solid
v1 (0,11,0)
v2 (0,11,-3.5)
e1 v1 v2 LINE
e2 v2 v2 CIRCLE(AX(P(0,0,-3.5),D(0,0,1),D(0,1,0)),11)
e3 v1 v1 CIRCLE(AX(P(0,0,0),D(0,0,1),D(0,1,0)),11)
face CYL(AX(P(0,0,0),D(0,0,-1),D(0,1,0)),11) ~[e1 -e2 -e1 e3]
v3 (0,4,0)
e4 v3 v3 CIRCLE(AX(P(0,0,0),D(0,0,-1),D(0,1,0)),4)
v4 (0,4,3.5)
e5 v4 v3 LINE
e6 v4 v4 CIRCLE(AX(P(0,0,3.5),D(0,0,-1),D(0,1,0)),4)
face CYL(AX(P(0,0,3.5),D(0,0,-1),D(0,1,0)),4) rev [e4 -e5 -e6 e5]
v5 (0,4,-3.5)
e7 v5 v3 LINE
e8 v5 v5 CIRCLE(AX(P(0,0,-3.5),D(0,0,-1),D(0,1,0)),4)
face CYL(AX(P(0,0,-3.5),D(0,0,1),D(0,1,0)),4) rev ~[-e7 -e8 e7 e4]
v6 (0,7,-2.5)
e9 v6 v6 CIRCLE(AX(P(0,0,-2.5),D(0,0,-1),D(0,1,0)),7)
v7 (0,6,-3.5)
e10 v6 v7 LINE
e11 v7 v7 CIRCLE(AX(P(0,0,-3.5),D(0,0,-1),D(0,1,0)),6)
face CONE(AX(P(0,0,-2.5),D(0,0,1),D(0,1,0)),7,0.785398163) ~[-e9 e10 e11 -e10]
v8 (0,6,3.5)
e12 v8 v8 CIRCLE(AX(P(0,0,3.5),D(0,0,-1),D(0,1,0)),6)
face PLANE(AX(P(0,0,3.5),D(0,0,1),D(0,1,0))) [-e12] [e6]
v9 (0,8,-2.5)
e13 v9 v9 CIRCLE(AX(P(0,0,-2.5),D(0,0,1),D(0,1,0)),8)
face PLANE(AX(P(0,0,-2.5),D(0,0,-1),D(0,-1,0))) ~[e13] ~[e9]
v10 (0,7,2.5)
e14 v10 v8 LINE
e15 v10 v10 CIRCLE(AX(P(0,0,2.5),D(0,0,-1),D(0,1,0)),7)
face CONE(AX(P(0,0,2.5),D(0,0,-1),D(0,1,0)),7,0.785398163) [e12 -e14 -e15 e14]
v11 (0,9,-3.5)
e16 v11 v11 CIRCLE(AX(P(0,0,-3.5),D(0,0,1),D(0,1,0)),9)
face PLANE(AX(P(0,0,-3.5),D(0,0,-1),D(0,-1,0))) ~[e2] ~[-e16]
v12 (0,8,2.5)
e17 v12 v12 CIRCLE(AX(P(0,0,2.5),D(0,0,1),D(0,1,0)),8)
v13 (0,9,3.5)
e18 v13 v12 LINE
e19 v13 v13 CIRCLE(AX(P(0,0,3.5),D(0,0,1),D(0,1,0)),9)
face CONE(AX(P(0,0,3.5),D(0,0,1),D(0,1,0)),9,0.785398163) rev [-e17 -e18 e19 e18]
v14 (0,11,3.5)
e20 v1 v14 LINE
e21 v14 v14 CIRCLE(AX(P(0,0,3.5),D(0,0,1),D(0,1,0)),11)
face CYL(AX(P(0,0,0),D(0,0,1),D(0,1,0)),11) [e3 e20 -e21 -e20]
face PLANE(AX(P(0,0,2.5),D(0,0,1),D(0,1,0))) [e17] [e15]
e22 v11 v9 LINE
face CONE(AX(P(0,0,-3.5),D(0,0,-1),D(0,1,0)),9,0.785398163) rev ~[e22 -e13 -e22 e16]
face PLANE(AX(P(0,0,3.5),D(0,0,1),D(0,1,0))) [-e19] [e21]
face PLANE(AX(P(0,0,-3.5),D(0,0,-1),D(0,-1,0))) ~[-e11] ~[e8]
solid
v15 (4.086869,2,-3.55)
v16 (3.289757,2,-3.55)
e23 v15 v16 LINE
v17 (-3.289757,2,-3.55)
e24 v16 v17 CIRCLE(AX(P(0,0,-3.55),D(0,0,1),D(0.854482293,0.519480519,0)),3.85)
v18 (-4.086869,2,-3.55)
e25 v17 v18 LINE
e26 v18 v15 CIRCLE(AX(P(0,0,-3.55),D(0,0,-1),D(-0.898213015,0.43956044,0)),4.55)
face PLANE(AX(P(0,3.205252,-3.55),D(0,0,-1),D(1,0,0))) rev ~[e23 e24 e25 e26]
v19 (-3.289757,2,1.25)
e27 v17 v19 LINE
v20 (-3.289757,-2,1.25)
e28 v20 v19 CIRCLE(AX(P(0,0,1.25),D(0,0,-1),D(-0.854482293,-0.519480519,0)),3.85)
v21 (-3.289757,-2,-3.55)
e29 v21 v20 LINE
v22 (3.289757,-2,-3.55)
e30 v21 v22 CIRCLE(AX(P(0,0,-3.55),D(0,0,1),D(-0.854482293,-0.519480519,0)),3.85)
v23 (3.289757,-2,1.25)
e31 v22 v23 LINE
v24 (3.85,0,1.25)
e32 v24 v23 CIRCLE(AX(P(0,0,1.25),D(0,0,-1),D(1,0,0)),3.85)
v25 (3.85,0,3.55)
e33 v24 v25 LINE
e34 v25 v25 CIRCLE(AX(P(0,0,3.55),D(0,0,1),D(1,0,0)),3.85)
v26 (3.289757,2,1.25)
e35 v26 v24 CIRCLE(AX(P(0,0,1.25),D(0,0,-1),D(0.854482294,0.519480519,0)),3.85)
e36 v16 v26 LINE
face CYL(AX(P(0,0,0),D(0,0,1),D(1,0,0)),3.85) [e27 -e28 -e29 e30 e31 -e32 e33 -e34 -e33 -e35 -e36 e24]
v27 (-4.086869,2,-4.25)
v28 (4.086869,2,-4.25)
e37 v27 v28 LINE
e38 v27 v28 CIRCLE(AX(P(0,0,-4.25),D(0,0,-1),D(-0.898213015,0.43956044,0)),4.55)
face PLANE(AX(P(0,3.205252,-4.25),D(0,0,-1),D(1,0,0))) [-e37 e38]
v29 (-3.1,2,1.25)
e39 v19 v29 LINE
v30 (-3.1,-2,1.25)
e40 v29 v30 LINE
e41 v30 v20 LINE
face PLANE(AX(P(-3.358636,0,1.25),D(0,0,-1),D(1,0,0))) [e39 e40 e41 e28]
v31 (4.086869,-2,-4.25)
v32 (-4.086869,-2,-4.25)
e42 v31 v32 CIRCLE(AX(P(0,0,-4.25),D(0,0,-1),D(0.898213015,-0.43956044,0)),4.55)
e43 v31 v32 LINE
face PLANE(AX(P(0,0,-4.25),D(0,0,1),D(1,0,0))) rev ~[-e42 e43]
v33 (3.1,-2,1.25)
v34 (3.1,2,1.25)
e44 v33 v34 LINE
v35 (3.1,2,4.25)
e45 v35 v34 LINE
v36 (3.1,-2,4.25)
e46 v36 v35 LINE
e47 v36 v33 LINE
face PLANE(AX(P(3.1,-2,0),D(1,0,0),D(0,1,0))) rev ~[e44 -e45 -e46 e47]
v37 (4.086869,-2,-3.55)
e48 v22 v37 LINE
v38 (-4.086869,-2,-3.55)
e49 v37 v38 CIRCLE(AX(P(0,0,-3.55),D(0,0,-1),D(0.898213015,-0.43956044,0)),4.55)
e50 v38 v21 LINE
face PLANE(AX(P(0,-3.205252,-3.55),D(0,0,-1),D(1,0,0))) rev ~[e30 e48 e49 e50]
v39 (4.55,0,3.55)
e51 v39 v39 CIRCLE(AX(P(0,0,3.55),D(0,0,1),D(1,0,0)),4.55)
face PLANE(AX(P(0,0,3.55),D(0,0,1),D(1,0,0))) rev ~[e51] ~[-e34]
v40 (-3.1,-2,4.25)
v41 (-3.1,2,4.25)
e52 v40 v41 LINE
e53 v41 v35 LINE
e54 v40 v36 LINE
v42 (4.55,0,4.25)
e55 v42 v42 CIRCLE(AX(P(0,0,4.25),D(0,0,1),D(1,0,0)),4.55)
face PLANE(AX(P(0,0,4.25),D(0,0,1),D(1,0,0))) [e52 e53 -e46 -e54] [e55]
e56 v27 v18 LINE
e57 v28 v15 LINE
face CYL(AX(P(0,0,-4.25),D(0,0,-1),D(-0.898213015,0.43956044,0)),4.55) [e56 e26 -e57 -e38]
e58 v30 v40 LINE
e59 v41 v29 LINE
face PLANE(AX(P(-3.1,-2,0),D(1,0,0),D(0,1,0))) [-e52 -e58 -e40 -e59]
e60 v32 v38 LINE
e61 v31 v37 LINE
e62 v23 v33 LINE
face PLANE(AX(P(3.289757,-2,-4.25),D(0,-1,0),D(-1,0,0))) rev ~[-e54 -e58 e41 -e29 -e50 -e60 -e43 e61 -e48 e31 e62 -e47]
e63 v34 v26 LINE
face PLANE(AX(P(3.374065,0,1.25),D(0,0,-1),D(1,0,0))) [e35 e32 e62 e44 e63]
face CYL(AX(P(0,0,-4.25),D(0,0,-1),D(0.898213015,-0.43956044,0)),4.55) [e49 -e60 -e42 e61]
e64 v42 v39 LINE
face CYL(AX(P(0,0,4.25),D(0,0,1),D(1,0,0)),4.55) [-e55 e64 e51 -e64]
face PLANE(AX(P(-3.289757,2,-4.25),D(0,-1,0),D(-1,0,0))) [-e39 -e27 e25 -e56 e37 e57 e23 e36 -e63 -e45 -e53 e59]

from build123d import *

# Parameters (mm, degrees)
F4_R      = 3.85
F4_W      = 6.2
F4_H      = 4
F9_DEPTH  = 4.25
F11_DEPTH = 5.5
F13_DEPTH = 0.7
F14_R     = 4.55
F14_R_2   = 3.85
F15_DEPTH = 0.7


# Not quite as in the source:
# - a feature of the source that left no trace in its solid (it failed there, or was rolled back) is left out


with BuildPart() as f2:
    # F1 (on Right) → F2 (revolve)
    with BuildSketch(Plane.YZ):
        Polygon((-11, 0), (-4, 0), (-4, 3.5), (-6, 3.5), (-7, 2.5), (-8, 2.5), (-9, 3.5), (-11, 3.5), align=None)
        Polygon((8, 2.5), (7, 2.5), (6, 3.5), (4, 3.5), (4, 0), (11, 0), (11, 3.5), (9, 3.5), align=None)
    revolve(axis=Axis((0, 0, 2.2127844859), (0, 0, 1)))


with BuildPart() as f3_1:
    # F3: instance of F2
    add(f2.part.mirror(Plane.XY))


with BuildPart() as f2_1:
    add(f2.part)

    # F8: F2 across plane
    add(f2.part.mirror(Plane.XY))


with BuildPart() as f9:
    # F4 (on Top) → F9 (new body, symmetric)
    with BuildSketch(Plane.XY):
        Circle(F4_R)
        Rectangle(F4_W, F4_H, mode=Mode.SUBTRACT)
    extrude(amount=F9_DEPTH, both=True)

    # F10 (on face) → F11 (cut)
    with BuildSketch(Plane(origin=(0, 0, -4.25), x_dir=(1, 0, 0), z_dir=(0, 0, -1))):
        with BuildLine():
            Line((-3.1, -2), (-3.1, 2))
            Line((-3.1, 2), (-3.2897568299, 2))
            ThreePointArc((-3.2897568299, 2), (-3.85, 0), (-3.2897568299, -2))
            Line((-3.2897568299, -2), (-3.1, -2))
        make_face()
        with BuildLine():
            Line((3.2897568299, 2), (3.1, 2))
            Line((3.1, 2), (3.1, -2))
            Line((3.1, -2), (3.2897568299, -2))
            ThreePointArc((3.2897568299, -2), (3.7072944174, -1.0384931884), (3.85, 0))
            ThreePointArc((3.85, 0), (3.7072944174, 1.0384931884), (3.2897568299, 2))
        make_face()
    extrude(amount=-F11_DEPTH, mode=Mode.SUBTRACT)

    # F12 (on face) → F13 (join)
    with BuildSketch(Plane(origin=(0, 0, -4.25), x_dir=(1, 0, 0), z_dir=(0, 0, -1))):
        with BuildLine():
            Line((-3.2897568299, -2), (-4.0868692174, -2))
            ThreePointArc((-4.0868692174, -2), (0, -4.55), (4.0868692174, -2))
            Line((4.0868692174, -2), (3.2897568299, -2))
            ThreePointArc((3.2897568299, -2), (0, -3.85), (-3.2897568299, -2))
        make_face()
        with BuildLine():
            ThreePointArc((4.0868692174, 2), (0, 4.55), (-4.0868692174, 2))
            Line((-4.0868692174, 2), (-3.2897568299, 2))
            ThreePointArc((-3.2897568299, 2), (0, 3.85), (3.2897568299, 2))
            Line((3.2897568299, 2), (4.0868692174, 2))
        make_face()
    extrude(amount=-F13_DEPTH)

    # F14 (on face) → F15 (join)
    with BuildSketch(Plane.XY.offset(4.25)):
        Circle(F14_R)
        Circle(F14_R_2, mode=Mode.SUBTRACT)
    extrude(amount=-F15_DEPTH)


solid = Compound([f2_1.part, f9.part])
